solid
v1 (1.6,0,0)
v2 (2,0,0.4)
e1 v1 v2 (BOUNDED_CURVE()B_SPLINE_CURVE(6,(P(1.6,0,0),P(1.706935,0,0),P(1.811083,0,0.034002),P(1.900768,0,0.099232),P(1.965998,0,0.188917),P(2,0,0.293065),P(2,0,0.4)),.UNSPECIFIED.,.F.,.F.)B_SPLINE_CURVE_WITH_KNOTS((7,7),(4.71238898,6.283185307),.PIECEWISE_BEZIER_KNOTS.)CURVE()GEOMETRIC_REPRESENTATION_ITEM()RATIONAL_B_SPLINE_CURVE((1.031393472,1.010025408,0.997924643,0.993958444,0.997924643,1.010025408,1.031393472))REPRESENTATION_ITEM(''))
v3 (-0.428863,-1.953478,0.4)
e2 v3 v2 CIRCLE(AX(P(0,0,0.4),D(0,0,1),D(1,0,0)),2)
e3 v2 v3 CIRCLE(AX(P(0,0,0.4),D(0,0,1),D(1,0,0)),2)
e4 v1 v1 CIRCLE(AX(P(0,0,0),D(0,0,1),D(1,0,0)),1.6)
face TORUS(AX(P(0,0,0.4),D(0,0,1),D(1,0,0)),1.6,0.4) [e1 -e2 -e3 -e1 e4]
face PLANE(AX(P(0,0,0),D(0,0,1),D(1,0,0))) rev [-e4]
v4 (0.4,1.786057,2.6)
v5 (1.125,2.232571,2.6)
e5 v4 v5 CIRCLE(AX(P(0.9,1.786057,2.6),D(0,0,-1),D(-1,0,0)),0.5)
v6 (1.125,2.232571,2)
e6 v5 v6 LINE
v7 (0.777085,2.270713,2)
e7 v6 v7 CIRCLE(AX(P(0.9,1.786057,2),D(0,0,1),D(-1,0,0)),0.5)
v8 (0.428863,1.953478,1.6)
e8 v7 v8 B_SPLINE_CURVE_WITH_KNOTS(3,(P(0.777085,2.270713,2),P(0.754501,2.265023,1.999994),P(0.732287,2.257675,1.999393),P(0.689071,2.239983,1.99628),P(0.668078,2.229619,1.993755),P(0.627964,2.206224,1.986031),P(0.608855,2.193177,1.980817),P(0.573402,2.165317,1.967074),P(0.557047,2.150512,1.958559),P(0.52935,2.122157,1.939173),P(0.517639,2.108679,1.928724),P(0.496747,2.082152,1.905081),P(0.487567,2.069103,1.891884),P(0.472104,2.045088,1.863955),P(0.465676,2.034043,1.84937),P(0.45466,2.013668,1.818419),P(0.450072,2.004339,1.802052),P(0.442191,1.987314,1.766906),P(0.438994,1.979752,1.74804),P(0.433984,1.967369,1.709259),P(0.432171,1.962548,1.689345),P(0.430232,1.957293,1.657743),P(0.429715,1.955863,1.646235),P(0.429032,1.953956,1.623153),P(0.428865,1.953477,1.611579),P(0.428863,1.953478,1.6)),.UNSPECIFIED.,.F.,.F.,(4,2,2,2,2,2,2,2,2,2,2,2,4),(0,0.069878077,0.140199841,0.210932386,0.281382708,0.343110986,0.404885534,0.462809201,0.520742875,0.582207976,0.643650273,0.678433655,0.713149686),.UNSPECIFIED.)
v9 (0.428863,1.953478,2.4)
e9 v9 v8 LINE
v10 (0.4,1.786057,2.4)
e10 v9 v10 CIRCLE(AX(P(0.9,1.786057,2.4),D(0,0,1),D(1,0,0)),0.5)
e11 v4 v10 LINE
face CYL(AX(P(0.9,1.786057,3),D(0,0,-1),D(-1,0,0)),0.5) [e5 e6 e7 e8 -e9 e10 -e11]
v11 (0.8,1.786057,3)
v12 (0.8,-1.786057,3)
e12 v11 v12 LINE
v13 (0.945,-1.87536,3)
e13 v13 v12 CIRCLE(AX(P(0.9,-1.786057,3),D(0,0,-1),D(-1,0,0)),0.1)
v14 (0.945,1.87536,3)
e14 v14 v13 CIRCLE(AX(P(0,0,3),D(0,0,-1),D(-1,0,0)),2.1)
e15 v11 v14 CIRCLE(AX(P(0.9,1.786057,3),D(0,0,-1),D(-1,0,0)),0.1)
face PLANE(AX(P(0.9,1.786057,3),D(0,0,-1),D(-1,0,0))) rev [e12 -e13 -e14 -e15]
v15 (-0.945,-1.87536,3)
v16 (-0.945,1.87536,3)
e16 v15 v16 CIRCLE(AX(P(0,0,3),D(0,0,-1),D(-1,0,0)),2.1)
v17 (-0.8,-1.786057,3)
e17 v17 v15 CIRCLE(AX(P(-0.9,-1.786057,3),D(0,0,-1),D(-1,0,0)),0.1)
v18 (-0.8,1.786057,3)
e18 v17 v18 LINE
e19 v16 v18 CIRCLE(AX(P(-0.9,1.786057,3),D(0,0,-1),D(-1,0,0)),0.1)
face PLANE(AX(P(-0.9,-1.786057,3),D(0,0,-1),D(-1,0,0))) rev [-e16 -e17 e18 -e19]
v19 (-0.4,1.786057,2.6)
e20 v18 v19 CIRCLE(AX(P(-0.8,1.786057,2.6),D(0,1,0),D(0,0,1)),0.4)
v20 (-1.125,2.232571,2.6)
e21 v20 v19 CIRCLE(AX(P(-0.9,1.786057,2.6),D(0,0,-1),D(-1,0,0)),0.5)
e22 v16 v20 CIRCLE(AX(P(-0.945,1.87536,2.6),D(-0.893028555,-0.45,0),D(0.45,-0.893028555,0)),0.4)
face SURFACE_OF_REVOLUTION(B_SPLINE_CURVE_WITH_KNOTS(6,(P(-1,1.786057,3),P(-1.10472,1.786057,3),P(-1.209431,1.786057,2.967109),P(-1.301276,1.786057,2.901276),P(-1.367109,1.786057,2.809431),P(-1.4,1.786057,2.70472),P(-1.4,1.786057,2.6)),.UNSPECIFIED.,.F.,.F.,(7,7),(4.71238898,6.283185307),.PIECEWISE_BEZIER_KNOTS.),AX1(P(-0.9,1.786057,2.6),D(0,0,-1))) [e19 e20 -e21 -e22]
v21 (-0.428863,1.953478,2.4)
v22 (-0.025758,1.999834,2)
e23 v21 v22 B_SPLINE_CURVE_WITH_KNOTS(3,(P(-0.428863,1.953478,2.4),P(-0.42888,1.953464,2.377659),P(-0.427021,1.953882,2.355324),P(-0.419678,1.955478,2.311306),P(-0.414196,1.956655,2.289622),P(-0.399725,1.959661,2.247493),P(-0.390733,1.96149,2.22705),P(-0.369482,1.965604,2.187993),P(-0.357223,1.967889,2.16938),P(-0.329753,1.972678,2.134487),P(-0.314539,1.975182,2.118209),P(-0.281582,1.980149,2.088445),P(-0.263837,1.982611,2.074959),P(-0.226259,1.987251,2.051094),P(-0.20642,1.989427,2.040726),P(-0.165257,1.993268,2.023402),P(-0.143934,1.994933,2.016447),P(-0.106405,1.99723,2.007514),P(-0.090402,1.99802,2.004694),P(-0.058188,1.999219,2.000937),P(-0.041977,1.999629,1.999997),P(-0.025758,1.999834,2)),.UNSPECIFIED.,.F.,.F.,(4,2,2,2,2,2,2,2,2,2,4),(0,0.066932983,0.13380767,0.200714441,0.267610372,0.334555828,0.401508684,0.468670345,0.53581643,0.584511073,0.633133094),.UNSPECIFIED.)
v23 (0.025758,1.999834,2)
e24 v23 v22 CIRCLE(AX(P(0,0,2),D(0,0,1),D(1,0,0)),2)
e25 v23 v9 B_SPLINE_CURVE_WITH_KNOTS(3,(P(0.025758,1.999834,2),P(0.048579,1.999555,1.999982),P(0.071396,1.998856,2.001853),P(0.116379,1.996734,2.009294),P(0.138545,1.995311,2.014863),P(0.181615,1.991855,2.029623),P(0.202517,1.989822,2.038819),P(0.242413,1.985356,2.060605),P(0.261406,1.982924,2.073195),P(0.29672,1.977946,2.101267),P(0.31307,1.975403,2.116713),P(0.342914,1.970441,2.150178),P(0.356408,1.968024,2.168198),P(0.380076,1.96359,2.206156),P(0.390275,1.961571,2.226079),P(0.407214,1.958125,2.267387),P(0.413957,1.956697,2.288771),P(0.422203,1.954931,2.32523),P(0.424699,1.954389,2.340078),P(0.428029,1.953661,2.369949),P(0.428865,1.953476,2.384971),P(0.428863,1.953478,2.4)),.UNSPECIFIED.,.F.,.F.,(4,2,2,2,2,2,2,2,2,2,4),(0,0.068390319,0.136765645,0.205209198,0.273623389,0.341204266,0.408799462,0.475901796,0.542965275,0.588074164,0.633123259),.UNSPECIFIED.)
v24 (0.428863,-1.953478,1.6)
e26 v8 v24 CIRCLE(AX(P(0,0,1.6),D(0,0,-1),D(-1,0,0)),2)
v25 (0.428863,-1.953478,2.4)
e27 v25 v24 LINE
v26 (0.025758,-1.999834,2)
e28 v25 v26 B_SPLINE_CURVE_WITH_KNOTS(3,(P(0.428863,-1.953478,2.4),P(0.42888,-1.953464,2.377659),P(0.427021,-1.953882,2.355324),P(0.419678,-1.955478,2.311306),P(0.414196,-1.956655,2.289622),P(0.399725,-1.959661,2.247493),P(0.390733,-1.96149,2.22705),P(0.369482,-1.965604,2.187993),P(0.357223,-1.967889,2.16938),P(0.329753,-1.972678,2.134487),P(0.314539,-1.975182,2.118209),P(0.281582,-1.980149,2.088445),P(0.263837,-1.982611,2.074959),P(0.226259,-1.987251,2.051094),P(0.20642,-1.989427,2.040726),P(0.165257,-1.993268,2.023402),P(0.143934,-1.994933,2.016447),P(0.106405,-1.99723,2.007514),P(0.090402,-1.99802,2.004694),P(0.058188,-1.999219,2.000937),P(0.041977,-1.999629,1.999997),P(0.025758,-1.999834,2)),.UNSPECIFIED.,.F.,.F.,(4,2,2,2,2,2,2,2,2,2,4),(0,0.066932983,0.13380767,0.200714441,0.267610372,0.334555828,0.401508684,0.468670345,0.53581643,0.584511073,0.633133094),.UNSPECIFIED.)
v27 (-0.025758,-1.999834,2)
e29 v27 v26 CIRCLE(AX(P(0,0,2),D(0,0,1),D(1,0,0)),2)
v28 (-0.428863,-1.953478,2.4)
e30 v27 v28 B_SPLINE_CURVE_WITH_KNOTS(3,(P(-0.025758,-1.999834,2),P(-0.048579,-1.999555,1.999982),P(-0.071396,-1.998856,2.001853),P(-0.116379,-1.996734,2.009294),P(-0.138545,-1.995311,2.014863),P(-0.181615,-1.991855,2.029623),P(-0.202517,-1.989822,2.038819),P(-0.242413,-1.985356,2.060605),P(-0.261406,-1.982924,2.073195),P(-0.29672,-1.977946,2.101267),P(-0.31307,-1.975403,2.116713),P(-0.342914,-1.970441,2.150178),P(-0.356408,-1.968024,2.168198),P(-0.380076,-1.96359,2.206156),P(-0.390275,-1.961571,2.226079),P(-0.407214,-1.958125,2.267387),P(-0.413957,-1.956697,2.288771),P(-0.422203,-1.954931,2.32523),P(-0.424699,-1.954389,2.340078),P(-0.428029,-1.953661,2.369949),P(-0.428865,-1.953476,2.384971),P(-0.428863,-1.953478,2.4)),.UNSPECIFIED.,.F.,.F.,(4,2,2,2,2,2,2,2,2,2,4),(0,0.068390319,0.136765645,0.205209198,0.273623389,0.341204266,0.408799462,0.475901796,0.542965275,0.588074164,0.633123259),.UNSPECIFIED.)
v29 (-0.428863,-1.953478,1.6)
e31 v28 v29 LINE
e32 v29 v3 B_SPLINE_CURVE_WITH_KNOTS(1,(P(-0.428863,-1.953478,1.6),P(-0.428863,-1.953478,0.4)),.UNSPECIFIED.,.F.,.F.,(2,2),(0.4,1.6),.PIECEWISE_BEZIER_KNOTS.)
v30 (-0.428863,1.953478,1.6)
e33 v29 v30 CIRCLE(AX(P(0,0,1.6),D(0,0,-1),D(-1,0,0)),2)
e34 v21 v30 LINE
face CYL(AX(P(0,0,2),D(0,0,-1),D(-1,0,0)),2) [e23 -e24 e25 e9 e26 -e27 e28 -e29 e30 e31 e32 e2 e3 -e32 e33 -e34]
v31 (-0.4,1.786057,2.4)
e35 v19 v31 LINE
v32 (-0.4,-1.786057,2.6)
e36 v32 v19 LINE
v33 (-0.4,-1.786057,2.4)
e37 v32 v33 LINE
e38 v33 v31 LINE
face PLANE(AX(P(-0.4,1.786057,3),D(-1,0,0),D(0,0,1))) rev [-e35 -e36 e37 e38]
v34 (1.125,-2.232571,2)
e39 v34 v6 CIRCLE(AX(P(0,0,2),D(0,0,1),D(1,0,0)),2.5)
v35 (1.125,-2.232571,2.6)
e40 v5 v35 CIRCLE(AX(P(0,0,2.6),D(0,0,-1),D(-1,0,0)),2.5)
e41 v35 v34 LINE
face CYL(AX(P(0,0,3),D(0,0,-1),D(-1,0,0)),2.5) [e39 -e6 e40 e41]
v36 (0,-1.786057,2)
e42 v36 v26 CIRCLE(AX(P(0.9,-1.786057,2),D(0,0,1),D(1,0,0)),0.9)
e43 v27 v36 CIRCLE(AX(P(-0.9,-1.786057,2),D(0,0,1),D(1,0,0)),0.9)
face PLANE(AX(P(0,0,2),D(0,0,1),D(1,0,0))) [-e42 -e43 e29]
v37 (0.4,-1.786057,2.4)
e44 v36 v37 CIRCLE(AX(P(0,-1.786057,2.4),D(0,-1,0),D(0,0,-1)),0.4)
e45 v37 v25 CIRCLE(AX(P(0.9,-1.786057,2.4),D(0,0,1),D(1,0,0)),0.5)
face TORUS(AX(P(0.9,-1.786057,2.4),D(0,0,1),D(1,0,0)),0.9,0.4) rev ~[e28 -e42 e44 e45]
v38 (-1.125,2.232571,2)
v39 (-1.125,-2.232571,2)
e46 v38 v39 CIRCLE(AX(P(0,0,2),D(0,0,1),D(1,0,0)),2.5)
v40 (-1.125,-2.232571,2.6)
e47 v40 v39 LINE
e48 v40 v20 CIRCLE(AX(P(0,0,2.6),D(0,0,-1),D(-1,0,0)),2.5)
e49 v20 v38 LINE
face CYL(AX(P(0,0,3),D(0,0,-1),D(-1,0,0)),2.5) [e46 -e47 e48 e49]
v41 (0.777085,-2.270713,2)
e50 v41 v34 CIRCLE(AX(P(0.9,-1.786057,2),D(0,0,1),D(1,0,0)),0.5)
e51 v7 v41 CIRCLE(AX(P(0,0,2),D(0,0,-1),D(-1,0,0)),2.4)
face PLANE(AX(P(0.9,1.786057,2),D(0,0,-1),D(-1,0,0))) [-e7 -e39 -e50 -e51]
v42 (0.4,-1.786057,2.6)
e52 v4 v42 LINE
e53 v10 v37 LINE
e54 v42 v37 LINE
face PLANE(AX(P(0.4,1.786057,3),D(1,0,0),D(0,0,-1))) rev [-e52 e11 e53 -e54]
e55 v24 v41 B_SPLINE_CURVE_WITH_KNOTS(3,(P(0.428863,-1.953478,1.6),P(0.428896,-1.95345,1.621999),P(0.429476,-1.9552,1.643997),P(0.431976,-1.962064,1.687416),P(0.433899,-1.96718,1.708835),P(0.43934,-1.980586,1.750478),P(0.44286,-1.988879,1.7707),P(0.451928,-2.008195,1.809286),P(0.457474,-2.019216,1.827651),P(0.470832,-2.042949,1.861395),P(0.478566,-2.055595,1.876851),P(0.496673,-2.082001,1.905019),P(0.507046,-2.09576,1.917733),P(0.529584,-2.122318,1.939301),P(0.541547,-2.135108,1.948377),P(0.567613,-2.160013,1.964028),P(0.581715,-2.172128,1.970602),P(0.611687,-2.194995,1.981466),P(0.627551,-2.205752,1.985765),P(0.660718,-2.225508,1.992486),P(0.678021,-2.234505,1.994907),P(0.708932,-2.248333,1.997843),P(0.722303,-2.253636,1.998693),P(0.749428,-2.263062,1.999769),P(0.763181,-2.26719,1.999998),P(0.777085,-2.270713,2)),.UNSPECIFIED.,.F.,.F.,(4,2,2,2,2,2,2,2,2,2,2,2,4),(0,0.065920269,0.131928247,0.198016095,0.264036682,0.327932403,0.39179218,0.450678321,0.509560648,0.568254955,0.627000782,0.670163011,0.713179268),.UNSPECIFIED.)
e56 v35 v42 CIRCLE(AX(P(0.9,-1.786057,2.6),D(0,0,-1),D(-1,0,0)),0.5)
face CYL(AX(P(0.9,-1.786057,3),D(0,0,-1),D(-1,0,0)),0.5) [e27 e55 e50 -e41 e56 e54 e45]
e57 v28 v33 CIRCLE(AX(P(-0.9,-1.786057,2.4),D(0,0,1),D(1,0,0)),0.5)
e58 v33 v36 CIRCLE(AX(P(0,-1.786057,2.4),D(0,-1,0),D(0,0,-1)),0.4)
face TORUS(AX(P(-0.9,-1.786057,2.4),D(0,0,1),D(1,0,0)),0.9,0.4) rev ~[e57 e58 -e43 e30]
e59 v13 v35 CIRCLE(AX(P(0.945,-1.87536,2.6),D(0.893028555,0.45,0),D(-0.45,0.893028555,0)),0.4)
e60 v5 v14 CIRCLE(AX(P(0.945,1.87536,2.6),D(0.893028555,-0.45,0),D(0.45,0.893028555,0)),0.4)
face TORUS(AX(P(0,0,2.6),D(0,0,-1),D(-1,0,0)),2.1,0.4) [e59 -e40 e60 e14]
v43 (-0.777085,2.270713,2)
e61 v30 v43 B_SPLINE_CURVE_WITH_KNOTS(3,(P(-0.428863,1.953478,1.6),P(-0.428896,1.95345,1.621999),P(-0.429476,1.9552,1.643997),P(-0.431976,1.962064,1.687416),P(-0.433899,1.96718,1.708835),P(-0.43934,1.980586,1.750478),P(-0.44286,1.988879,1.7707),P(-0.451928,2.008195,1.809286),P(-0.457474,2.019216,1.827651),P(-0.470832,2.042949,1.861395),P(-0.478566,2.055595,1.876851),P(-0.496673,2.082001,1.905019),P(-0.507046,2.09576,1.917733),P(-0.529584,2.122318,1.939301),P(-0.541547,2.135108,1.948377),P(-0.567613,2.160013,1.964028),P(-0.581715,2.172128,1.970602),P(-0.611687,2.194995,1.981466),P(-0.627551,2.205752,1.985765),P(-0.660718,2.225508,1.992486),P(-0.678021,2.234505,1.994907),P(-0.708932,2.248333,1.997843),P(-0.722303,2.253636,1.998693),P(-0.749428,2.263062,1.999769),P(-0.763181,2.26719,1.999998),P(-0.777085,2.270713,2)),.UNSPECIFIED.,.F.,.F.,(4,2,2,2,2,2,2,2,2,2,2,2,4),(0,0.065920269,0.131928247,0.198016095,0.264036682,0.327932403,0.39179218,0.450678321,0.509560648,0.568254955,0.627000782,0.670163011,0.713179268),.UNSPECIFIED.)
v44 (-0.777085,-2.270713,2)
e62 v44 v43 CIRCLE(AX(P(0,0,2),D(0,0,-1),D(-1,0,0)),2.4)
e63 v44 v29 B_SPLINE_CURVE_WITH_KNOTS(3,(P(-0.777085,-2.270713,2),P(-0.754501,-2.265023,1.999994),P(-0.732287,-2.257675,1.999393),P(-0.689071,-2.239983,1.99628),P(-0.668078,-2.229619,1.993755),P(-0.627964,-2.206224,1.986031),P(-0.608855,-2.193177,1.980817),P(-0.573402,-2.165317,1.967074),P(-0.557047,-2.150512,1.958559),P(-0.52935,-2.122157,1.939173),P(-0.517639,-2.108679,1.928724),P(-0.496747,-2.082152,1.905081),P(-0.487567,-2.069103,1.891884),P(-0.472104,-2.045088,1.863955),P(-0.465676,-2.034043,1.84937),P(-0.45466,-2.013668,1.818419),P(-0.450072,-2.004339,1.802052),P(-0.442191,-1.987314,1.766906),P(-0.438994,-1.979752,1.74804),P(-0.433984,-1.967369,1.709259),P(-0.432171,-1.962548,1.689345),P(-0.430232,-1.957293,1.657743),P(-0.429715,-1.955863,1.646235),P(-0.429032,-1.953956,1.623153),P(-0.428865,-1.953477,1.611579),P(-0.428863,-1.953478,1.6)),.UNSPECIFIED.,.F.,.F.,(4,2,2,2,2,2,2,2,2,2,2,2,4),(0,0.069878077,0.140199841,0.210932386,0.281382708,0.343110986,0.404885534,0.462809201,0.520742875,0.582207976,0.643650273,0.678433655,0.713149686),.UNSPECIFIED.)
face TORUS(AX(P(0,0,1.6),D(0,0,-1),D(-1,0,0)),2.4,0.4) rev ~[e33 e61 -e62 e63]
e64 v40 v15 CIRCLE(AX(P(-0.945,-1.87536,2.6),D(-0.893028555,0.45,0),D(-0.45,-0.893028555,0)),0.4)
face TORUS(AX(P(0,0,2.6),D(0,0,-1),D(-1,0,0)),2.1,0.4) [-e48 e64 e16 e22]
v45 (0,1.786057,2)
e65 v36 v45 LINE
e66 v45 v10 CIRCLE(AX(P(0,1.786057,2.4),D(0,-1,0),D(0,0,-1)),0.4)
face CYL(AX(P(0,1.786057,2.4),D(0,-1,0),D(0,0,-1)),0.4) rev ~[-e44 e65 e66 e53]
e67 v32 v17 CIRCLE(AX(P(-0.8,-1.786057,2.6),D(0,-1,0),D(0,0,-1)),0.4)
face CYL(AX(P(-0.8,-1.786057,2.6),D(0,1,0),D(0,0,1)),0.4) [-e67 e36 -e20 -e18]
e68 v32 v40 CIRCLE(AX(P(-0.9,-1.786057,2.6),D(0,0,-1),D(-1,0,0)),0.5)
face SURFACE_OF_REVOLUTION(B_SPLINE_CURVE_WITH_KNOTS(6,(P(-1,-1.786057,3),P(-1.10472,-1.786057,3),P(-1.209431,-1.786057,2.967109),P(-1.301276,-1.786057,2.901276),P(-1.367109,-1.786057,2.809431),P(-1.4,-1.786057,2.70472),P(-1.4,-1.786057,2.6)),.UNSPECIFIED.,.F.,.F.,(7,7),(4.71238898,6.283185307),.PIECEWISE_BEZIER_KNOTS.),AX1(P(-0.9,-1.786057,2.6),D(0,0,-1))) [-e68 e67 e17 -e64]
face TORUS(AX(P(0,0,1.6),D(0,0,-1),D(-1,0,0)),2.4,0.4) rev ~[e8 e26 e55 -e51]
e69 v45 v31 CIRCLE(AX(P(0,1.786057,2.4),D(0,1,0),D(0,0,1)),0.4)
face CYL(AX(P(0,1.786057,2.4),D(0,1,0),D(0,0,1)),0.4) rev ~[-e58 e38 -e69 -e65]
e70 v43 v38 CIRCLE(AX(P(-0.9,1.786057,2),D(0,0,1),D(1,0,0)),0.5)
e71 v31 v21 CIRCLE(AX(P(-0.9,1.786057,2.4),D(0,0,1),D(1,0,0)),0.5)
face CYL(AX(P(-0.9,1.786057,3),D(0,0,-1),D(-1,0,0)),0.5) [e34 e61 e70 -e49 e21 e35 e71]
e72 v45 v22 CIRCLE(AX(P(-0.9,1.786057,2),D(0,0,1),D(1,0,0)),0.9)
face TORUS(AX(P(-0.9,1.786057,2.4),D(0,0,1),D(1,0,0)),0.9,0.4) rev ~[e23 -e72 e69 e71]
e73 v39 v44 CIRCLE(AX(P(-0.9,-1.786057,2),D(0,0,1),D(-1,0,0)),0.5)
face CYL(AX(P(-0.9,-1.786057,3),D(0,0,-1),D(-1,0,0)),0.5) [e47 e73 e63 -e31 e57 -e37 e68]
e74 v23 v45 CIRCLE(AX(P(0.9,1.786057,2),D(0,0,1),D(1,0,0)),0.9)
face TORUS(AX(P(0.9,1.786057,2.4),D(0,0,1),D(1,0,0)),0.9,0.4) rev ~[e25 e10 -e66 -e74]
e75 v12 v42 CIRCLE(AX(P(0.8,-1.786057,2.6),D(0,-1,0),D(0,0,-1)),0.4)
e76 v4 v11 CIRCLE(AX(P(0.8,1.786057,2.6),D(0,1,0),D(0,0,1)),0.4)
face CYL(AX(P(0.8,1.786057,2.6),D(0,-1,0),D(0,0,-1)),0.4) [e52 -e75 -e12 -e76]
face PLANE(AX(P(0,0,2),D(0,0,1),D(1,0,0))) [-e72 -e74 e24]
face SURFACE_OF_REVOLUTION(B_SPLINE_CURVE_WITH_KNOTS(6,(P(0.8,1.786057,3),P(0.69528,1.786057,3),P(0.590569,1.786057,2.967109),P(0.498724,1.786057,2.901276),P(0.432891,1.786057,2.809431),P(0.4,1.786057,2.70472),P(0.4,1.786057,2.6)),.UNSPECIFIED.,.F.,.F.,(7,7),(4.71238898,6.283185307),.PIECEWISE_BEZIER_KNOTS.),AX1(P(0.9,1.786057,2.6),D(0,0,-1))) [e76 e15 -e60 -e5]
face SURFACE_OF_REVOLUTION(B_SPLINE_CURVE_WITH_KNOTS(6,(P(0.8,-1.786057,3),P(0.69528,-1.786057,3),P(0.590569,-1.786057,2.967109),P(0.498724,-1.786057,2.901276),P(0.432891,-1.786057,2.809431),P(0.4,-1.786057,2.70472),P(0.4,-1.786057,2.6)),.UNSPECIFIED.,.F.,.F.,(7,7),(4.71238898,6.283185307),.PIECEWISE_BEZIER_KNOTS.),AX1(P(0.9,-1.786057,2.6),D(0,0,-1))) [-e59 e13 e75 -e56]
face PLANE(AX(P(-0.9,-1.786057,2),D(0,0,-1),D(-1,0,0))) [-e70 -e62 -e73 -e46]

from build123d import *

# Parameters (mm, degrees)
ESQUISSE1_R        = 2
BOSS_EXTRU_1_DEPTH = 2
BOSS_EXTRU_2_DEPTH = 1
BOSS_EXTRU_3_DEPTH = 1
CONG_1_R           = 0.4
CONG_2_R           = 0.4


with BuildPart() as part:
    # Esquisse1 → Boss.-Extru.1 (new body)
    with BuildSketch(Plane.XY):
        Circle(ESQUISSE1_R)
    extrude(amount=BOSS_EXTRU_1_DEPTH)

    # Esquisse2 → Boss.-Extru.2 (add)
    with BuildSketch(Plane.XY.offset(2)):
        with BuildLine():
            Line((0.4, 1.78605711), (0.4, -1.78605711))
            ThreePointArc((0.4, -1.78605711), (0.637797788, -2.211791769), (1.125, -2.232571387))
            ThreePointArc((1.125, -2.232571387), (2.5, 0), (1.125, 2.232571387))
            ThreePointArc((1.125, 2.232571387), (0.637797788, 2.211791769), (0.4, 1.78605711))
        make_face()
    extrude(amount=BOSS_EXTRU_2_DEPTH)

    # Esquisse3 → Boss.-Extru.3 (add)
    with BuildSketch(Plane.XY.offset(2)):
        with BuildLine():
            Line((-0.4, 1.78605711), (-0.4, -1.78605711))
            ThreePointArc((-0.4, -1.78605711), (-0.637797788, -2.211791769), (-1.125, -2.232571387))
            ThreePointArc((-1.125, -2.232571387), (-2.5, 0), (-1.125, 2.232571387))
            ThreePointArc((-1.125, 2.232571387), (-0.637797788, 2.211791769), (-0.4, 1.78605711))
        make_face()
    extrude(amount=BOSS_EXTRU_3_DEPTH)

    # Congé1
    cong_1_edges = [part.edges().sort_by_distance(p)[0] for p in [
        (2.5, 0, 3),
        (-0.407268544, -1.871002459, 2),
        (-0.4, 0, 2),
        (-0.407268544, 1.871002459, 2),
        (-0.637797788, -2.211791769, 3),
        (-0.4, 0, 3),
        (-0.637797788, 2.211791769, 3),
        (-2.5, 0, 3),
        (0.407268544, 1.871002459, 2),
        (0.4, 0, 2),
        (0.407268544, -1.871002459, 2),
        (0.637797788, 2.211791769, 3),
        (0.4, 0, 3),
        (0.637797788, -2.211791769, 3),
    ]]
    fillet(cong_1_edges, radius=CONG_1_R - 0.0001)  # a hair under: the kernel refuses the full size

    # Congé2
    cong_2_edges = [part.edges().sort_by_distance(p)[0] for p in [
        (-2, 0, 0),
        (-2, 0, 2),
        (1.558480943, 1.253450099, 2),
    ]]
    fillet(cong_2_edges, radius=CONG_2_R)


solid = part.part
